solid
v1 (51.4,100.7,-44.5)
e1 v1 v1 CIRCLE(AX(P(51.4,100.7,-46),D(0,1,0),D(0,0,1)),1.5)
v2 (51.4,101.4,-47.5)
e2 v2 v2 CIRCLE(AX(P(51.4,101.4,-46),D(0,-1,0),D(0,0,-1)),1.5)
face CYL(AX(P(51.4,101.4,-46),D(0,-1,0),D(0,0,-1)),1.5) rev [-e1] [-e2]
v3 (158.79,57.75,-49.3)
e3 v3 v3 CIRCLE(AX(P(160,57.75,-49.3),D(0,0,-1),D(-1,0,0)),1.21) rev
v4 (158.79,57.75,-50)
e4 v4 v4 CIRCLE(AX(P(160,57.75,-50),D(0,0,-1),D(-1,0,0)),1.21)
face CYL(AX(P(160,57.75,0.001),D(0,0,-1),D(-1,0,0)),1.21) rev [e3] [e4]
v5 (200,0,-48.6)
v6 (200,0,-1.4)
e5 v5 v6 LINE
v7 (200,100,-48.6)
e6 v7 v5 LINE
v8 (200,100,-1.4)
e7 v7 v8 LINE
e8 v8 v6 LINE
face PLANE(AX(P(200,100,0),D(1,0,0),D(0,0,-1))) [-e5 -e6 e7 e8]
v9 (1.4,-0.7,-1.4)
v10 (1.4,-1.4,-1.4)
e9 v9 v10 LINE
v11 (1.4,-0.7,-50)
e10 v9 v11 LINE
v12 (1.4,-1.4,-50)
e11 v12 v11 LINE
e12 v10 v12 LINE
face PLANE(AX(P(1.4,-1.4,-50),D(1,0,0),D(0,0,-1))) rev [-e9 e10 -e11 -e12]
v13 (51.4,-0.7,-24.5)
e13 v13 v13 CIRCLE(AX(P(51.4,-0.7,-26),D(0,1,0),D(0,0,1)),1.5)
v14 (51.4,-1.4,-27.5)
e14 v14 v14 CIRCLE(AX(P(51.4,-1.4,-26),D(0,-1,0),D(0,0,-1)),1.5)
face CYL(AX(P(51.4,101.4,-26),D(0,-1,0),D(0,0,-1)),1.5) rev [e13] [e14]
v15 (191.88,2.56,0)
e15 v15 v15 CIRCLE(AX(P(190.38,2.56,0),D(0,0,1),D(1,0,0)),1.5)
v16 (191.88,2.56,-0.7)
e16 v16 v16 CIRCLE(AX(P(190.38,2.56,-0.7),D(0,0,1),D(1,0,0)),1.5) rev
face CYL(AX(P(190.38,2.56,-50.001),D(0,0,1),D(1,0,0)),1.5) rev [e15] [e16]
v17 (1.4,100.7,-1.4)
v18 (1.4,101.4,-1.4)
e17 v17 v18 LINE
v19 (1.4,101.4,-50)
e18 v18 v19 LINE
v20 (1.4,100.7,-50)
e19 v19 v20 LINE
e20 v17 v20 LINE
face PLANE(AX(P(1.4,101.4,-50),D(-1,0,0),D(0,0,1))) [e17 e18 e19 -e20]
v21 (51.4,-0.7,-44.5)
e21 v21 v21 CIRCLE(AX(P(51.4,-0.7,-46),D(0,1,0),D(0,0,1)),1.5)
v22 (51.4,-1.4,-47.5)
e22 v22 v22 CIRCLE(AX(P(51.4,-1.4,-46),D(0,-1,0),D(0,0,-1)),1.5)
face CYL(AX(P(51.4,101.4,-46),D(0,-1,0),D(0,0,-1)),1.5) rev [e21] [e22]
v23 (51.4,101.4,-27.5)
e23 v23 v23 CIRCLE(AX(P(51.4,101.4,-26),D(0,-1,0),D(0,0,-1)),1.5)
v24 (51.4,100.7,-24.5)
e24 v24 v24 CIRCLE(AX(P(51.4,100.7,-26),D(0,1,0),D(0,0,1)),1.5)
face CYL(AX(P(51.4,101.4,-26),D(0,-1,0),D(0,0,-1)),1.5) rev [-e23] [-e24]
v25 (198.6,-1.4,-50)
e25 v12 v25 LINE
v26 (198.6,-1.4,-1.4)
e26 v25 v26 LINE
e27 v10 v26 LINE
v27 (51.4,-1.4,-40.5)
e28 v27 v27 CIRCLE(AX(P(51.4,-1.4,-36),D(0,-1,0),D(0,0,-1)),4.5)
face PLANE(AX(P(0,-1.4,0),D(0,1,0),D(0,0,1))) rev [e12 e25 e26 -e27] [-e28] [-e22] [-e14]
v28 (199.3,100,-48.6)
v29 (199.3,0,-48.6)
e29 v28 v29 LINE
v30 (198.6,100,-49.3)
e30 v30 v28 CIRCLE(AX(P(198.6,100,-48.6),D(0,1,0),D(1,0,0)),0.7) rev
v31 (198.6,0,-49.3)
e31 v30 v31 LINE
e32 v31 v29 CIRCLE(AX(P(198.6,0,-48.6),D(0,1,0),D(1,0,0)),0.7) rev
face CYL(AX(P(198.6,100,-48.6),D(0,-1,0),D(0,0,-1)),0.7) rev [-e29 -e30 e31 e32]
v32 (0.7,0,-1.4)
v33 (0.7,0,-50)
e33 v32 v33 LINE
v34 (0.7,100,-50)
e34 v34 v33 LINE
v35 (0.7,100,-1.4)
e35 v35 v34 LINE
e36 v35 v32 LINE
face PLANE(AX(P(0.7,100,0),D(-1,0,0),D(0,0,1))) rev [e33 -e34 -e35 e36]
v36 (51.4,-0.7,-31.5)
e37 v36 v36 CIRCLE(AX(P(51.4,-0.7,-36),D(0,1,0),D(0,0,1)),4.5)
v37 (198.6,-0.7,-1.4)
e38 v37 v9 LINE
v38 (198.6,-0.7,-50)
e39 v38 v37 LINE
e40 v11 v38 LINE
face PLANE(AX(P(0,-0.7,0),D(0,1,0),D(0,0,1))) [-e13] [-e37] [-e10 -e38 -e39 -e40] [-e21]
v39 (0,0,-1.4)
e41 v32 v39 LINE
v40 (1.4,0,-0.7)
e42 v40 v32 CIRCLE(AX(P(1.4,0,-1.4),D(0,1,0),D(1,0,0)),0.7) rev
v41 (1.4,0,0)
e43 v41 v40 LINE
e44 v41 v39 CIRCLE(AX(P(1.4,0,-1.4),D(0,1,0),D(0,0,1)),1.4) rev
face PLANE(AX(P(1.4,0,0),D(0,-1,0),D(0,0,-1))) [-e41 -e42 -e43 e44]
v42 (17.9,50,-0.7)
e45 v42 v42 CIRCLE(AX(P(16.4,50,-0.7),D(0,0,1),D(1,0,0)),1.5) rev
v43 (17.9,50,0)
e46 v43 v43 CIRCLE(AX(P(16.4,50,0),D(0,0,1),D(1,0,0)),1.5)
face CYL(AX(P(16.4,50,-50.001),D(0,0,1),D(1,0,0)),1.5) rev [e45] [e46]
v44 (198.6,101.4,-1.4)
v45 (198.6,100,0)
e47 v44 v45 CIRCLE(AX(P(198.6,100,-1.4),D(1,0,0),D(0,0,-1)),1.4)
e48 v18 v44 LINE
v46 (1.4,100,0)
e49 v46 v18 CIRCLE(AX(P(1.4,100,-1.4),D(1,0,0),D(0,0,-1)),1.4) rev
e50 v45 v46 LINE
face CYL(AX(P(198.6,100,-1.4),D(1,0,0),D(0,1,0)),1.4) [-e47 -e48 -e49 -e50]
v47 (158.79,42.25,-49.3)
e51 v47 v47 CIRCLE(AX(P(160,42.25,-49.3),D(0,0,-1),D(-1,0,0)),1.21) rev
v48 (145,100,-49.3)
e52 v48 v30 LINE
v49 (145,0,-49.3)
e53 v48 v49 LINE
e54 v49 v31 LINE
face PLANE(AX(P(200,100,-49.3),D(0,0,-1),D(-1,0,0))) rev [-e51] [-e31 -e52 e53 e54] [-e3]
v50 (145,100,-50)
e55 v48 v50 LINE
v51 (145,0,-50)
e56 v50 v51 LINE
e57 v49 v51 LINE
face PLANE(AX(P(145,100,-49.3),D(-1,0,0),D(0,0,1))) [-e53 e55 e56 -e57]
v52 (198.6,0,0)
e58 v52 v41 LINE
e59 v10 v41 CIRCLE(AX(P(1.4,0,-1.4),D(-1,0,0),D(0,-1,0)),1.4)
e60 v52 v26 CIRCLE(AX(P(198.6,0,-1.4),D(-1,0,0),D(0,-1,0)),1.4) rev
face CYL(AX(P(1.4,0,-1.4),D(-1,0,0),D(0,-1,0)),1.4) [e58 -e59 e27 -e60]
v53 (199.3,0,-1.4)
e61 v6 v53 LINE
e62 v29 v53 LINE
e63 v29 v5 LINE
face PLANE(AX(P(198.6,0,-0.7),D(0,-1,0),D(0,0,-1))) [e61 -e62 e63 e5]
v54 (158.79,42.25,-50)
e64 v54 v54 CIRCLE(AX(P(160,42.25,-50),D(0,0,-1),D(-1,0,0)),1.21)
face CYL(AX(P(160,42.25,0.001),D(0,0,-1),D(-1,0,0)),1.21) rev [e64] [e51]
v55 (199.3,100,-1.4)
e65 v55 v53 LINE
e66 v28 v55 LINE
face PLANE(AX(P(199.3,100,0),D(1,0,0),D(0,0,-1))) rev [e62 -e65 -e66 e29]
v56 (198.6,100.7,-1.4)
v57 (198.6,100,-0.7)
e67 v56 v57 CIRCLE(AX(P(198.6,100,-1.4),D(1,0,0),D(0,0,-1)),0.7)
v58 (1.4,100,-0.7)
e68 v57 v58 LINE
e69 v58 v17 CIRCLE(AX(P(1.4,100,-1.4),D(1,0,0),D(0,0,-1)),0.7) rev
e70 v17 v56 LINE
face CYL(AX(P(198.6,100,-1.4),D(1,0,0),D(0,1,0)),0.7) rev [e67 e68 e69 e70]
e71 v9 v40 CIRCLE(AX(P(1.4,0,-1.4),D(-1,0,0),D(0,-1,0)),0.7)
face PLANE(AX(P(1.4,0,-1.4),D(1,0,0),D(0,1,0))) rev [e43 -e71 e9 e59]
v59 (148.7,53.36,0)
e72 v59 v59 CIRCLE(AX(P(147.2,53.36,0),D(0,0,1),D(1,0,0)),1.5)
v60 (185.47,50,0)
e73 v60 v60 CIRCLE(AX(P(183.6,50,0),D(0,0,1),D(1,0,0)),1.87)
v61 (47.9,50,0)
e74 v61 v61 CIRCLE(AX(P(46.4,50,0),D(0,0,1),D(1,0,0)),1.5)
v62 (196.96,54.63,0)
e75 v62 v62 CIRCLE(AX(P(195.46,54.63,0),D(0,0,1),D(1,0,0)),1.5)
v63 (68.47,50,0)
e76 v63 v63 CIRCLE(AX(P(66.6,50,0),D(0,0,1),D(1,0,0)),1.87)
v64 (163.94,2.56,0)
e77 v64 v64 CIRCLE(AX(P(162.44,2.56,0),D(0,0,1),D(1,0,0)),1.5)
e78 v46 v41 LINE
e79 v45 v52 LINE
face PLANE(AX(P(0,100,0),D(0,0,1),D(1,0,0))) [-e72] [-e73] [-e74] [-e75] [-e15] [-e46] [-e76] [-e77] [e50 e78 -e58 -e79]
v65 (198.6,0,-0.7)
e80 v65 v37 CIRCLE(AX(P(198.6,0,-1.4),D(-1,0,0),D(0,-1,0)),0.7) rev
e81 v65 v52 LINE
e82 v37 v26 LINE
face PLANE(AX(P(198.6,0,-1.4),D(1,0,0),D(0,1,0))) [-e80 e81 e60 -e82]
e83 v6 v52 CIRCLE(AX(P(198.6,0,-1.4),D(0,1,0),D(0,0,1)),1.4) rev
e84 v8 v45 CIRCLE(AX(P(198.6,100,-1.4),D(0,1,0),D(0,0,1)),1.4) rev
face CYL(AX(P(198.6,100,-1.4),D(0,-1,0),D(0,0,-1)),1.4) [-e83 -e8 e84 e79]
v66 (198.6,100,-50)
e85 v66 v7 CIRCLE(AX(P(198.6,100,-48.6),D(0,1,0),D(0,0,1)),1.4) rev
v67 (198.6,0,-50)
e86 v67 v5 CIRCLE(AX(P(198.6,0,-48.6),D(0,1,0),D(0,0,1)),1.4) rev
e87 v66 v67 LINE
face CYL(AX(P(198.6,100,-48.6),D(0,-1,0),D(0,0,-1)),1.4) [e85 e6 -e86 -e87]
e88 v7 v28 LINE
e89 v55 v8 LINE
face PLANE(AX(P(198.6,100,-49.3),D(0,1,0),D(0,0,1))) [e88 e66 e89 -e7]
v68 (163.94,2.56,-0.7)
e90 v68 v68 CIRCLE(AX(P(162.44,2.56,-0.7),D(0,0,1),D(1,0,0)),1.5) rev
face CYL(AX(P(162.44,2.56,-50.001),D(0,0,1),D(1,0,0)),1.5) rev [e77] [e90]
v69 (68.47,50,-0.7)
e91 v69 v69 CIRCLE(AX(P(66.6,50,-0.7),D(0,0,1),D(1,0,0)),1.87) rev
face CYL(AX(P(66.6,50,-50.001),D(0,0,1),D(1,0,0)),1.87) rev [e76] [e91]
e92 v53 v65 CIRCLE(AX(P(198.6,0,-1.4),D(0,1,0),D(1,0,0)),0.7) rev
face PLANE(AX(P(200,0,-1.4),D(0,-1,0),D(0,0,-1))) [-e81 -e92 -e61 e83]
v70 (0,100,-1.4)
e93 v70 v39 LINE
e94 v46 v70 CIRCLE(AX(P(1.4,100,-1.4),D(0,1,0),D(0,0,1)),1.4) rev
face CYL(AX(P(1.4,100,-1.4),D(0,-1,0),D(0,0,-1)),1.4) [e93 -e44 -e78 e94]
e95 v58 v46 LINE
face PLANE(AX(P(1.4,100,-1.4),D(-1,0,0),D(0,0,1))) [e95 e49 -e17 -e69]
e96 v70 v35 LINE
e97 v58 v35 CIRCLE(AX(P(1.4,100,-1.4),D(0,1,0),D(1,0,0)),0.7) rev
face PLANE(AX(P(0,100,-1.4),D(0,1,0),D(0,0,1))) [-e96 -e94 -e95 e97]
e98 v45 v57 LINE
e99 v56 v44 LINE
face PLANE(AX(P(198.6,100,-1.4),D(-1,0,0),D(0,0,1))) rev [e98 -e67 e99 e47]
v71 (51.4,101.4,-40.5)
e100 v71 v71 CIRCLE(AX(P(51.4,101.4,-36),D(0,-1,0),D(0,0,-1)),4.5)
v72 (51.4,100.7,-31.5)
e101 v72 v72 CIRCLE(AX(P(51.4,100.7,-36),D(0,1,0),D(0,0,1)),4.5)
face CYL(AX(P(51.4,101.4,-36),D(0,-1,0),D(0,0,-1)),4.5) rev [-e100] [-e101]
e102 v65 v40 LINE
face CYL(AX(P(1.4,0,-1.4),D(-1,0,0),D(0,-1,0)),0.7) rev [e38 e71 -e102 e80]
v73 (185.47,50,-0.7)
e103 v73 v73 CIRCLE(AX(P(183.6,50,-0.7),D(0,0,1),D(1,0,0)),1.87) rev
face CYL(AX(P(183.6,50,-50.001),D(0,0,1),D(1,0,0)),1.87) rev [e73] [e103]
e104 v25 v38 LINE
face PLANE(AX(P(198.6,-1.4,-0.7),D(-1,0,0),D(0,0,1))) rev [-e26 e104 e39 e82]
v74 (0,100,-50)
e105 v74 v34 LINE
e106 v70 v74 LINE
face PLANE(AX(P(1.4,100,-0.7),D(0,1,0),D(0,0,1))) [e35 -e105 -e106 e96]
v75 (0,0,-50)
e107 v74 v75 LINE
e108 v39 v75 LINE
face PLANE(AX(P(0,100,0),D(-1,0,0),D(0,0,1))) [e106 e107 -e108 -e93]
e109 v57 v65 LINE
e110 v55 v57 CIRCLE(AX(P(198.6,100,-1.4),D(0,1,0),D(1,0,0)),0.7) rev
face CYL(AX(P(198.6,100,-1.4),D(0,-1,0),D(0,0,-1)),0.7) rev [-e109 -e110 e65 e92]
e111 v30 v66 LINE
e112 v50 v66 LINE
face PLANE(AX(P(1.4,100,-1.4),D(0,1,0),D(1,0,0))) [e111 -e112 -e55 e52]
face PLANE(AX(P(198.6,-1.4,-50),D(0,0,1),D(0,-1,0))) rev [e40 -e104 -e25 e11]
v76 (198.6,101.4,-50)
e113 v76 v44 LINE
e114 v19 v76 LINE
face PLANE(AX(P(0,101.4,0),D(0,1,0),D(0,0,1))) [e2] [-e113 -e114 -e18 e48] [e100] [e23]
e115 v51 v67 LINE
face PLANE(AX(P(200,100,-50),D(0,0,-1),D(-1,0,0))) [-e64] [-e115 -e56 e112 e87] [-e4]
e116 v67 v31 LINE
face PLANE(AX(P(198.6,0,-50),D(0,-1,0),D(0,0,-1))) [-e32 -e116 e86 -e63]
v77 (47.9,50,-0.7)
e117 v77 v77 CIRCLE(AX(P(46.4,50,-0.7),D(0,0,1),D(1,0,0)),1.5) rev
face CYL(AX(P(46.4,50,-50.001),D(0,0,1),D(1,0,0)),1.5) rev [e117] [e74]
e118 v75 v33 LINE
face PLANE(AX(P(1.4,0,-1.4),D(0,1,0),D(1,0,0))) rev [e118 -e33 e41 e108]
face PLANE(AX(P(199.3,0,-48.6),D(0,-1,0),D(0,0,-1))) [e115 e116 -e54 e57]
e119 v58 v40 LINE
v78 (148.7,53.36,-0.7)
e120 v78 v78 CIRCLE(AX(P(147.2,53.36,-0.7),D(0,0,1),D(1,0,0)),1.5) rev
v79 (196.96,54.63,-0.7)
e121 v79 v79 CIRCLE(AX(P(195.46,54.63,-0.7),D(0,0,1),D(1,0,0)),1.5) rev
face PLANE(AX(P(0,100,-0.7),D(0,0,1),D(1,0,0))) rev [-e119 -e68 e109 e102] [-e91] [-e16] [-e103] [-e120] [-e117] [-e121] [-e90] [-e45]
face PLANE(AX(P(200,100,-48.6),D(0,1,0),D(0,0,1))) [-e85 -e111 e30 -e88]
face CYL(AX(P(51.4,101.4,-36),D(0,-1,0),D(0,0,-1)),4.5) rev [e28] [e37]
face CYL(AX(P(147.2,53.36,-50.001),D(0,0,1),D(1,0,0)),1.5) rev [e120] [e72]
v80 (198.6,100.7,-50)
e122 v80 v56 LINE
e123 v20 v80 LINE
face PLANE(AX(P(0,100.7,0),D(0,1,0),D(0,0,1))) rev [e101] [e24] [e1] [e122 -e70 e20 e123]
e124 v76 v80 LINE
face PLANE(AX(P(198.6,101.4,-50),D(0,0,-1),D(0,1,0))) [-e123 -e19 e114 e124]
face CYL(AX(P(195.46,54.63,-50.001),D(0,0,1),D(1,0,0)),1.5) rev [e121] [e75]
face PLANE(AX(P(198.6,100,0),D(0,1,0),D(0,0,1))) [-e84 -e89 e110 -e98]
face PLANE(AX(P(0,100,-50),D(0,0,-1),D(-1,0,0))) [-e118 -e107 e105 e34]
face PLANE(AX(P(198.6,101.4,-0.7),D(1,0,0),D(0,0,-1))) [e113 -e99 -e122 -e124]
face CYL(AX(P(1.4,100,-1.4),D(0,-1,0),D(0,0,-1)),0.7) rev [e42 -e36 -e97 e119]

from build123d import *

# Parameters (mm, degrees)
BASE_FLANGE1_DEPTH = 100
EDGE_FLANGE1_DEPTH = 197.2
EDGE_FLANGE2_DEPTH = 197.2
HOLE1_START        = -1.4
HOLE1_OUTLINE_R    = 4.5
HOLE1_OUTLINE_R_2  = 1.5
HOLE1_DEPTH        = 102.8
CUT_EXTRUDE2_REACH = 231.743
SKETCH20_R         = 1.21
CUT_EXTRUDE3_REACH = 231.743
SKETCH22_R         = 1.5
SKETCH22_R_2       = 1.87
CUT_EXTRUDE4_REACH = 231.743
SKETCH25_R         = 1.5


# Read off the part's stored shape, not the designer's step: Hole1
# Sheet-metal steps are written as plain solids
with BuildPart() as part:
    # Sketch1 → Base-Flange1 (new body)
    with BuildSketch(Plane(origin=(0, 0, 0), x_dir=(1, 0, 0), z_dir=(0, 1, 0))):
        with BuildLine():
            Line((0, 50), (0, 1.4))
            ThreePointArc((0, 1.4), (0.410050506, 0.410050506), (1.4, 0))
            Line((1.4, 0), (198.6, 0))
            ThreePointArc((198.6, 0), (199.589949494, 0.410050506), (200, 1.4))
            Line((200, 1.4), (200, 48.6))
            ThreePointArc((200, 48.6), (199.589949494, 49.589949494), (198.6, 50))
            Line((198.6, 50), (145, 50))
            Line((145, 50), (145, 49.3))
            Line((145, 49.3), (198.6, 49.3))
            ThreePointArc((198.6, 49.3), (199.094974747, 49.094974747), (199.3, 48.6))
            Line((199.3, 48.6), (199.3, 1.4))
            ThreePointArc((199.3, 1.4), (199.094974747, 0.905025253), (198.6, 0.7))
            Line((198.6, 0.7), (1.4, 0.7))
            ThreePointArc((1.4, 0.7), (0.905025253, 0.905025253), (0.7, 1.4))
            Line((0.7, 1.4), (0.7, 50))
            Line((0.7, 50), (0, 50))
        make_face()
    extrude(amount=BASE_FLANGE1_DEPTH)

    # Edge-Flange1 section (across the edge) → Edge-Flange1 (add)
    with BuildSketch(Plane(origin=(198.6, -0.7, -0.7), x_dir=(0, 1, 0), z_dir=(-1, 0, 0))):
        with BuildLine():
            Line((-0.7, 0.7), (-0.7, 49.3))
            Line((-0.7, 49.3), (0, 49.3))
            Line((0, 49.3), (0, 0.7))
            ThreePointArc((0, 0.7), (0.205025253, 0.205025253), (0.7, 0))
            Line((0.7, 0), (0.7, -0.7))
            ThreePointArc((0.7, -0.7), (-0.289949494, -0.289949494), (-0.7, 0.7))
        make_face()
    extrude(amount=EDGE_FLANGE1_DEPTH)

    # Edge-Flange2 section (across the edge) → Edge-Flange2 (add)
    with BuildSketch(Plane(origin=(1.4, 100.7, -0.7), x_dir=(0, -1, 0), z_dir=(1, 0, 0))):
        with BuildLine():
            Line((-0.7, 0.7), (-0.7, 49.3))
            Line((-0.7, 49.3), (0, 49.3))
            Line((0, 49.3), (0, 0.7))
            ThreePointArc((0, 0.7), (0.205025253, 0.205025253), (0.7, 0))
            Line((0.7, 0), (0.7, -0.7))
            ThreePointArc((0.7, -0.7), (-0.289949494, -0.289949494), (-0.7, 0.7))
        make_face()
    extrude(amount=EDGE_FLANGE2_DEPTH)

    # Hole1 outline → Hole1 (cut)
    with BuildSketch(Plane(origin=(0, 0, 0), x_dir=(1, 0, 0), z_dir=(0, 1, 0)).offset(HOLE1_START)):
        with Locations((51.4, 36)):
            Circle(HOLE1_OUTLINE_R)
        with Locations((51.4, 26)):
            Circle(HOLE1_OUTLINE_R_2)
        with Locations((51.4, 46)):
            Circle(HOLE1_OUTLINE_R_2)
    extrude(amount=HOLE1_DEPTH, mode=Mode.SUBTRACT)

    # Sketch20 → Cut-Extrude2 (cut, up to next)
    with BuildSketch(Plane(origin=(0, 0, -50), x_dir=(-1, 0, 0), z_dir=(0, 0, -1)), mode=Mode.PRIVATE) as cut_extrude2_sk1:
        with Locations((-160, 57.75)):
            Circle(SKETCH20_R)
    cut_extrude2_tool1 = extrude(cut_extrude2_sk1.sketch, amount=-CUT_EXTRUDE2_REACH, mode=Mode.PRIVATE) & part.part
    # Sketch20 → Cut-Extrude2 (cut, up to next)
    with BuildSketch(Plane(origin=(0, 0, -50), x_dir=(-1, 0, 0), z_dir=(0, 0, -1)), mode=Mode.PRIVATE) as cut_extrude2_sk2:
        with Locations((-160, 42.25)):
            Circle(SKETCH20_R)
    cut_extrude2_tool2 = extrude(cut_extrude2_sk2.sketch, amount=-CUT_EXTRUDE2_REACH, mode=Mode.PRIVATE) & part.part
    add(cut_extrude2_tool1.solids().sort_by_distance((160, 57.75, -50))[0], mode=Mode.SUBTRACT)
    add(cut_extrude2_tool2.solids().sort_by_distance((160, 42.25, -50))[0], mode=Mode.SUBTRACT)

    # Sketch22 → Cut-Extrude3 (cut, up to next)
    with BuildSketch(Plane.XY, mode=Mode.PRIVATE) as cut_extrude3_sk1:
        with Locations((16.4, 50)):
            Circle(SKETCH22_R)
    cut_extrude3_tool1 = extrude(cut_extrude3_sk1.sketch, amount=-CUT_EXTRUDE3_REACH, mode=Mode.PRIVATE) & part.part
    # Sketch22 → Cut-Extrude3 (cut, up to next)
    with BuildSketch(Plane.XY, mode=Mode.PRIVATE) as cut_extrude3_sk2:
        with Locations((46.4, 50)):
            Circle(SKETCH22_R)
    cut_extrude3_tool2 = extrude(cut_extrude3_sk2.sketch, amount=-CUT_EXTRUDE3_REACH, mode=Mode.PRIVATE) & part.part
    # Sketch22 → Cut-Extrude3 (cut, up to next)
    with BuildSketch(Plane.XY, mode=Mode.PRIVATE) as cut_extrude3_sk3:
        with Locations((66.6, 50)):
            Circle(SKETCH22_R_2)
    cut_extrude3_tool3 = extrude(cut_extrude3_sk3.sketch, amount=-CUT_EXTRUDE3_REACH, mode=Mode.PRIVATE) & part.part
    # Sketch22 → Cut-Extrude3 (cut, up to next)
    with BuildSketch(Plane.XY, mode=Mode.PRIVATE) as cut_extrude3_sk4:
        with Locations((183.6, 50)):
            Circle(SKETCH22_R_2)
    cut_extrude3_tool4 = extrude(cut_extrude3_sk4.sketch, amount=-CUT_EXTRUDE3_REACH, mode=Mode.PRIVATE) & part.part
    add(cut_extrude3_tool1.solids().sort_by_distance((16.4, 50, 0))[0], mode=Mode.SUBTRACT)
    add(cut_extrude3_tool2.solids().sort_by_distance((46.4, 50, 0))[0], mode=Mode.SUBTRACT)
    add(cut_extrude3_tool3.solids().sort_by_distance((66.6, 50, 0))[0], mode=Mode.SUBTRACT)
    add(cut_extrude3_tool4.solids().sort_by_distance((183.6, 50, 0))[0], mode=Mode.SUBTRACT)

    # Sketch25 → Cut-Extrude4 (cut, up to next)
    with BuildSketch(Plane.XY, mode=Mode.PRIVATE) as cut_extrude4_sk1:
        with Locations((190.38, 2.56)):
            Circle(SKETCH25_R)
    cut_extrude4_tool1 = extrude(cut_extrude4_sk1.sketch, amount=-CUT_EXTRUDE4_REACH, mode=Mode.PRIVATE) & part.part
    # Sketch25 → Cut-Extrude4 (cut, up to next)
    with BuildSketch(Plane.XY, mode=Mode.PRIVATE) as cut_extrude4_sk2:
        with Locations((162.44, 2.56)):
            Circle(SKETCH25_R)
    cut_extrude4_tool2 = extrude(cut_extrude4_sk2.sketch, amount=-CUT_EXTRUDE4_REACH, mode=Mode.PRIVATE) & part.part
    # Sketch25 → Cut-Extrude4 (cut, up to next)
    with BuildSketch(Plane.XY, mode=Mode.PRIVATE) as cut_extrude4_sk3:
        with Locations((195.46, 54.63)):
            Circle(SKETCH25_R)
    cut_extrude4_tool3 = extrude(cut_extrude4_sk3.sketch, amount=-CUT_EXTRUDE4_REACH, mode=Mode.PRIVATE) & part.part
    # Sketch25 → Cut-Extrude4 (cut, up to next)
    with BuildSketch(Plane.XY, mode=Mode.PRIVATE) as cut_extrude4_sk4:
        with Locations((147.2, 53.36)):
            Circle(SKETCH25_R)
    cut_extrude4_tool4 = extrude(cut_extrude4_sk4.sketch, amount=-CUT_EXTRUDE4_REACH, mode=Mode.PRIVATE) & part.part
    add(cut_extrude4_tool1.solids().sort_by_distance((190.38, 2.56, 0))[0], mode=Mode.SUBTRACT)
    add(cut_extrude4_tool2.solids().sort_by_distance((162.44, 2.56, 0))[0], mode=Mode.SUBTRACT)
    add(cut_extrude4_tool3.solids().sort_by_distance((195.46, 54.63, 0))[0], mode=Mode.SUBTRACT)
    add(cut_extrude4_tool4.solids().sort_by_distance((147.2, 53.36, 0))[0], mode=Mode.SUBTRACT)


solid = part.part
